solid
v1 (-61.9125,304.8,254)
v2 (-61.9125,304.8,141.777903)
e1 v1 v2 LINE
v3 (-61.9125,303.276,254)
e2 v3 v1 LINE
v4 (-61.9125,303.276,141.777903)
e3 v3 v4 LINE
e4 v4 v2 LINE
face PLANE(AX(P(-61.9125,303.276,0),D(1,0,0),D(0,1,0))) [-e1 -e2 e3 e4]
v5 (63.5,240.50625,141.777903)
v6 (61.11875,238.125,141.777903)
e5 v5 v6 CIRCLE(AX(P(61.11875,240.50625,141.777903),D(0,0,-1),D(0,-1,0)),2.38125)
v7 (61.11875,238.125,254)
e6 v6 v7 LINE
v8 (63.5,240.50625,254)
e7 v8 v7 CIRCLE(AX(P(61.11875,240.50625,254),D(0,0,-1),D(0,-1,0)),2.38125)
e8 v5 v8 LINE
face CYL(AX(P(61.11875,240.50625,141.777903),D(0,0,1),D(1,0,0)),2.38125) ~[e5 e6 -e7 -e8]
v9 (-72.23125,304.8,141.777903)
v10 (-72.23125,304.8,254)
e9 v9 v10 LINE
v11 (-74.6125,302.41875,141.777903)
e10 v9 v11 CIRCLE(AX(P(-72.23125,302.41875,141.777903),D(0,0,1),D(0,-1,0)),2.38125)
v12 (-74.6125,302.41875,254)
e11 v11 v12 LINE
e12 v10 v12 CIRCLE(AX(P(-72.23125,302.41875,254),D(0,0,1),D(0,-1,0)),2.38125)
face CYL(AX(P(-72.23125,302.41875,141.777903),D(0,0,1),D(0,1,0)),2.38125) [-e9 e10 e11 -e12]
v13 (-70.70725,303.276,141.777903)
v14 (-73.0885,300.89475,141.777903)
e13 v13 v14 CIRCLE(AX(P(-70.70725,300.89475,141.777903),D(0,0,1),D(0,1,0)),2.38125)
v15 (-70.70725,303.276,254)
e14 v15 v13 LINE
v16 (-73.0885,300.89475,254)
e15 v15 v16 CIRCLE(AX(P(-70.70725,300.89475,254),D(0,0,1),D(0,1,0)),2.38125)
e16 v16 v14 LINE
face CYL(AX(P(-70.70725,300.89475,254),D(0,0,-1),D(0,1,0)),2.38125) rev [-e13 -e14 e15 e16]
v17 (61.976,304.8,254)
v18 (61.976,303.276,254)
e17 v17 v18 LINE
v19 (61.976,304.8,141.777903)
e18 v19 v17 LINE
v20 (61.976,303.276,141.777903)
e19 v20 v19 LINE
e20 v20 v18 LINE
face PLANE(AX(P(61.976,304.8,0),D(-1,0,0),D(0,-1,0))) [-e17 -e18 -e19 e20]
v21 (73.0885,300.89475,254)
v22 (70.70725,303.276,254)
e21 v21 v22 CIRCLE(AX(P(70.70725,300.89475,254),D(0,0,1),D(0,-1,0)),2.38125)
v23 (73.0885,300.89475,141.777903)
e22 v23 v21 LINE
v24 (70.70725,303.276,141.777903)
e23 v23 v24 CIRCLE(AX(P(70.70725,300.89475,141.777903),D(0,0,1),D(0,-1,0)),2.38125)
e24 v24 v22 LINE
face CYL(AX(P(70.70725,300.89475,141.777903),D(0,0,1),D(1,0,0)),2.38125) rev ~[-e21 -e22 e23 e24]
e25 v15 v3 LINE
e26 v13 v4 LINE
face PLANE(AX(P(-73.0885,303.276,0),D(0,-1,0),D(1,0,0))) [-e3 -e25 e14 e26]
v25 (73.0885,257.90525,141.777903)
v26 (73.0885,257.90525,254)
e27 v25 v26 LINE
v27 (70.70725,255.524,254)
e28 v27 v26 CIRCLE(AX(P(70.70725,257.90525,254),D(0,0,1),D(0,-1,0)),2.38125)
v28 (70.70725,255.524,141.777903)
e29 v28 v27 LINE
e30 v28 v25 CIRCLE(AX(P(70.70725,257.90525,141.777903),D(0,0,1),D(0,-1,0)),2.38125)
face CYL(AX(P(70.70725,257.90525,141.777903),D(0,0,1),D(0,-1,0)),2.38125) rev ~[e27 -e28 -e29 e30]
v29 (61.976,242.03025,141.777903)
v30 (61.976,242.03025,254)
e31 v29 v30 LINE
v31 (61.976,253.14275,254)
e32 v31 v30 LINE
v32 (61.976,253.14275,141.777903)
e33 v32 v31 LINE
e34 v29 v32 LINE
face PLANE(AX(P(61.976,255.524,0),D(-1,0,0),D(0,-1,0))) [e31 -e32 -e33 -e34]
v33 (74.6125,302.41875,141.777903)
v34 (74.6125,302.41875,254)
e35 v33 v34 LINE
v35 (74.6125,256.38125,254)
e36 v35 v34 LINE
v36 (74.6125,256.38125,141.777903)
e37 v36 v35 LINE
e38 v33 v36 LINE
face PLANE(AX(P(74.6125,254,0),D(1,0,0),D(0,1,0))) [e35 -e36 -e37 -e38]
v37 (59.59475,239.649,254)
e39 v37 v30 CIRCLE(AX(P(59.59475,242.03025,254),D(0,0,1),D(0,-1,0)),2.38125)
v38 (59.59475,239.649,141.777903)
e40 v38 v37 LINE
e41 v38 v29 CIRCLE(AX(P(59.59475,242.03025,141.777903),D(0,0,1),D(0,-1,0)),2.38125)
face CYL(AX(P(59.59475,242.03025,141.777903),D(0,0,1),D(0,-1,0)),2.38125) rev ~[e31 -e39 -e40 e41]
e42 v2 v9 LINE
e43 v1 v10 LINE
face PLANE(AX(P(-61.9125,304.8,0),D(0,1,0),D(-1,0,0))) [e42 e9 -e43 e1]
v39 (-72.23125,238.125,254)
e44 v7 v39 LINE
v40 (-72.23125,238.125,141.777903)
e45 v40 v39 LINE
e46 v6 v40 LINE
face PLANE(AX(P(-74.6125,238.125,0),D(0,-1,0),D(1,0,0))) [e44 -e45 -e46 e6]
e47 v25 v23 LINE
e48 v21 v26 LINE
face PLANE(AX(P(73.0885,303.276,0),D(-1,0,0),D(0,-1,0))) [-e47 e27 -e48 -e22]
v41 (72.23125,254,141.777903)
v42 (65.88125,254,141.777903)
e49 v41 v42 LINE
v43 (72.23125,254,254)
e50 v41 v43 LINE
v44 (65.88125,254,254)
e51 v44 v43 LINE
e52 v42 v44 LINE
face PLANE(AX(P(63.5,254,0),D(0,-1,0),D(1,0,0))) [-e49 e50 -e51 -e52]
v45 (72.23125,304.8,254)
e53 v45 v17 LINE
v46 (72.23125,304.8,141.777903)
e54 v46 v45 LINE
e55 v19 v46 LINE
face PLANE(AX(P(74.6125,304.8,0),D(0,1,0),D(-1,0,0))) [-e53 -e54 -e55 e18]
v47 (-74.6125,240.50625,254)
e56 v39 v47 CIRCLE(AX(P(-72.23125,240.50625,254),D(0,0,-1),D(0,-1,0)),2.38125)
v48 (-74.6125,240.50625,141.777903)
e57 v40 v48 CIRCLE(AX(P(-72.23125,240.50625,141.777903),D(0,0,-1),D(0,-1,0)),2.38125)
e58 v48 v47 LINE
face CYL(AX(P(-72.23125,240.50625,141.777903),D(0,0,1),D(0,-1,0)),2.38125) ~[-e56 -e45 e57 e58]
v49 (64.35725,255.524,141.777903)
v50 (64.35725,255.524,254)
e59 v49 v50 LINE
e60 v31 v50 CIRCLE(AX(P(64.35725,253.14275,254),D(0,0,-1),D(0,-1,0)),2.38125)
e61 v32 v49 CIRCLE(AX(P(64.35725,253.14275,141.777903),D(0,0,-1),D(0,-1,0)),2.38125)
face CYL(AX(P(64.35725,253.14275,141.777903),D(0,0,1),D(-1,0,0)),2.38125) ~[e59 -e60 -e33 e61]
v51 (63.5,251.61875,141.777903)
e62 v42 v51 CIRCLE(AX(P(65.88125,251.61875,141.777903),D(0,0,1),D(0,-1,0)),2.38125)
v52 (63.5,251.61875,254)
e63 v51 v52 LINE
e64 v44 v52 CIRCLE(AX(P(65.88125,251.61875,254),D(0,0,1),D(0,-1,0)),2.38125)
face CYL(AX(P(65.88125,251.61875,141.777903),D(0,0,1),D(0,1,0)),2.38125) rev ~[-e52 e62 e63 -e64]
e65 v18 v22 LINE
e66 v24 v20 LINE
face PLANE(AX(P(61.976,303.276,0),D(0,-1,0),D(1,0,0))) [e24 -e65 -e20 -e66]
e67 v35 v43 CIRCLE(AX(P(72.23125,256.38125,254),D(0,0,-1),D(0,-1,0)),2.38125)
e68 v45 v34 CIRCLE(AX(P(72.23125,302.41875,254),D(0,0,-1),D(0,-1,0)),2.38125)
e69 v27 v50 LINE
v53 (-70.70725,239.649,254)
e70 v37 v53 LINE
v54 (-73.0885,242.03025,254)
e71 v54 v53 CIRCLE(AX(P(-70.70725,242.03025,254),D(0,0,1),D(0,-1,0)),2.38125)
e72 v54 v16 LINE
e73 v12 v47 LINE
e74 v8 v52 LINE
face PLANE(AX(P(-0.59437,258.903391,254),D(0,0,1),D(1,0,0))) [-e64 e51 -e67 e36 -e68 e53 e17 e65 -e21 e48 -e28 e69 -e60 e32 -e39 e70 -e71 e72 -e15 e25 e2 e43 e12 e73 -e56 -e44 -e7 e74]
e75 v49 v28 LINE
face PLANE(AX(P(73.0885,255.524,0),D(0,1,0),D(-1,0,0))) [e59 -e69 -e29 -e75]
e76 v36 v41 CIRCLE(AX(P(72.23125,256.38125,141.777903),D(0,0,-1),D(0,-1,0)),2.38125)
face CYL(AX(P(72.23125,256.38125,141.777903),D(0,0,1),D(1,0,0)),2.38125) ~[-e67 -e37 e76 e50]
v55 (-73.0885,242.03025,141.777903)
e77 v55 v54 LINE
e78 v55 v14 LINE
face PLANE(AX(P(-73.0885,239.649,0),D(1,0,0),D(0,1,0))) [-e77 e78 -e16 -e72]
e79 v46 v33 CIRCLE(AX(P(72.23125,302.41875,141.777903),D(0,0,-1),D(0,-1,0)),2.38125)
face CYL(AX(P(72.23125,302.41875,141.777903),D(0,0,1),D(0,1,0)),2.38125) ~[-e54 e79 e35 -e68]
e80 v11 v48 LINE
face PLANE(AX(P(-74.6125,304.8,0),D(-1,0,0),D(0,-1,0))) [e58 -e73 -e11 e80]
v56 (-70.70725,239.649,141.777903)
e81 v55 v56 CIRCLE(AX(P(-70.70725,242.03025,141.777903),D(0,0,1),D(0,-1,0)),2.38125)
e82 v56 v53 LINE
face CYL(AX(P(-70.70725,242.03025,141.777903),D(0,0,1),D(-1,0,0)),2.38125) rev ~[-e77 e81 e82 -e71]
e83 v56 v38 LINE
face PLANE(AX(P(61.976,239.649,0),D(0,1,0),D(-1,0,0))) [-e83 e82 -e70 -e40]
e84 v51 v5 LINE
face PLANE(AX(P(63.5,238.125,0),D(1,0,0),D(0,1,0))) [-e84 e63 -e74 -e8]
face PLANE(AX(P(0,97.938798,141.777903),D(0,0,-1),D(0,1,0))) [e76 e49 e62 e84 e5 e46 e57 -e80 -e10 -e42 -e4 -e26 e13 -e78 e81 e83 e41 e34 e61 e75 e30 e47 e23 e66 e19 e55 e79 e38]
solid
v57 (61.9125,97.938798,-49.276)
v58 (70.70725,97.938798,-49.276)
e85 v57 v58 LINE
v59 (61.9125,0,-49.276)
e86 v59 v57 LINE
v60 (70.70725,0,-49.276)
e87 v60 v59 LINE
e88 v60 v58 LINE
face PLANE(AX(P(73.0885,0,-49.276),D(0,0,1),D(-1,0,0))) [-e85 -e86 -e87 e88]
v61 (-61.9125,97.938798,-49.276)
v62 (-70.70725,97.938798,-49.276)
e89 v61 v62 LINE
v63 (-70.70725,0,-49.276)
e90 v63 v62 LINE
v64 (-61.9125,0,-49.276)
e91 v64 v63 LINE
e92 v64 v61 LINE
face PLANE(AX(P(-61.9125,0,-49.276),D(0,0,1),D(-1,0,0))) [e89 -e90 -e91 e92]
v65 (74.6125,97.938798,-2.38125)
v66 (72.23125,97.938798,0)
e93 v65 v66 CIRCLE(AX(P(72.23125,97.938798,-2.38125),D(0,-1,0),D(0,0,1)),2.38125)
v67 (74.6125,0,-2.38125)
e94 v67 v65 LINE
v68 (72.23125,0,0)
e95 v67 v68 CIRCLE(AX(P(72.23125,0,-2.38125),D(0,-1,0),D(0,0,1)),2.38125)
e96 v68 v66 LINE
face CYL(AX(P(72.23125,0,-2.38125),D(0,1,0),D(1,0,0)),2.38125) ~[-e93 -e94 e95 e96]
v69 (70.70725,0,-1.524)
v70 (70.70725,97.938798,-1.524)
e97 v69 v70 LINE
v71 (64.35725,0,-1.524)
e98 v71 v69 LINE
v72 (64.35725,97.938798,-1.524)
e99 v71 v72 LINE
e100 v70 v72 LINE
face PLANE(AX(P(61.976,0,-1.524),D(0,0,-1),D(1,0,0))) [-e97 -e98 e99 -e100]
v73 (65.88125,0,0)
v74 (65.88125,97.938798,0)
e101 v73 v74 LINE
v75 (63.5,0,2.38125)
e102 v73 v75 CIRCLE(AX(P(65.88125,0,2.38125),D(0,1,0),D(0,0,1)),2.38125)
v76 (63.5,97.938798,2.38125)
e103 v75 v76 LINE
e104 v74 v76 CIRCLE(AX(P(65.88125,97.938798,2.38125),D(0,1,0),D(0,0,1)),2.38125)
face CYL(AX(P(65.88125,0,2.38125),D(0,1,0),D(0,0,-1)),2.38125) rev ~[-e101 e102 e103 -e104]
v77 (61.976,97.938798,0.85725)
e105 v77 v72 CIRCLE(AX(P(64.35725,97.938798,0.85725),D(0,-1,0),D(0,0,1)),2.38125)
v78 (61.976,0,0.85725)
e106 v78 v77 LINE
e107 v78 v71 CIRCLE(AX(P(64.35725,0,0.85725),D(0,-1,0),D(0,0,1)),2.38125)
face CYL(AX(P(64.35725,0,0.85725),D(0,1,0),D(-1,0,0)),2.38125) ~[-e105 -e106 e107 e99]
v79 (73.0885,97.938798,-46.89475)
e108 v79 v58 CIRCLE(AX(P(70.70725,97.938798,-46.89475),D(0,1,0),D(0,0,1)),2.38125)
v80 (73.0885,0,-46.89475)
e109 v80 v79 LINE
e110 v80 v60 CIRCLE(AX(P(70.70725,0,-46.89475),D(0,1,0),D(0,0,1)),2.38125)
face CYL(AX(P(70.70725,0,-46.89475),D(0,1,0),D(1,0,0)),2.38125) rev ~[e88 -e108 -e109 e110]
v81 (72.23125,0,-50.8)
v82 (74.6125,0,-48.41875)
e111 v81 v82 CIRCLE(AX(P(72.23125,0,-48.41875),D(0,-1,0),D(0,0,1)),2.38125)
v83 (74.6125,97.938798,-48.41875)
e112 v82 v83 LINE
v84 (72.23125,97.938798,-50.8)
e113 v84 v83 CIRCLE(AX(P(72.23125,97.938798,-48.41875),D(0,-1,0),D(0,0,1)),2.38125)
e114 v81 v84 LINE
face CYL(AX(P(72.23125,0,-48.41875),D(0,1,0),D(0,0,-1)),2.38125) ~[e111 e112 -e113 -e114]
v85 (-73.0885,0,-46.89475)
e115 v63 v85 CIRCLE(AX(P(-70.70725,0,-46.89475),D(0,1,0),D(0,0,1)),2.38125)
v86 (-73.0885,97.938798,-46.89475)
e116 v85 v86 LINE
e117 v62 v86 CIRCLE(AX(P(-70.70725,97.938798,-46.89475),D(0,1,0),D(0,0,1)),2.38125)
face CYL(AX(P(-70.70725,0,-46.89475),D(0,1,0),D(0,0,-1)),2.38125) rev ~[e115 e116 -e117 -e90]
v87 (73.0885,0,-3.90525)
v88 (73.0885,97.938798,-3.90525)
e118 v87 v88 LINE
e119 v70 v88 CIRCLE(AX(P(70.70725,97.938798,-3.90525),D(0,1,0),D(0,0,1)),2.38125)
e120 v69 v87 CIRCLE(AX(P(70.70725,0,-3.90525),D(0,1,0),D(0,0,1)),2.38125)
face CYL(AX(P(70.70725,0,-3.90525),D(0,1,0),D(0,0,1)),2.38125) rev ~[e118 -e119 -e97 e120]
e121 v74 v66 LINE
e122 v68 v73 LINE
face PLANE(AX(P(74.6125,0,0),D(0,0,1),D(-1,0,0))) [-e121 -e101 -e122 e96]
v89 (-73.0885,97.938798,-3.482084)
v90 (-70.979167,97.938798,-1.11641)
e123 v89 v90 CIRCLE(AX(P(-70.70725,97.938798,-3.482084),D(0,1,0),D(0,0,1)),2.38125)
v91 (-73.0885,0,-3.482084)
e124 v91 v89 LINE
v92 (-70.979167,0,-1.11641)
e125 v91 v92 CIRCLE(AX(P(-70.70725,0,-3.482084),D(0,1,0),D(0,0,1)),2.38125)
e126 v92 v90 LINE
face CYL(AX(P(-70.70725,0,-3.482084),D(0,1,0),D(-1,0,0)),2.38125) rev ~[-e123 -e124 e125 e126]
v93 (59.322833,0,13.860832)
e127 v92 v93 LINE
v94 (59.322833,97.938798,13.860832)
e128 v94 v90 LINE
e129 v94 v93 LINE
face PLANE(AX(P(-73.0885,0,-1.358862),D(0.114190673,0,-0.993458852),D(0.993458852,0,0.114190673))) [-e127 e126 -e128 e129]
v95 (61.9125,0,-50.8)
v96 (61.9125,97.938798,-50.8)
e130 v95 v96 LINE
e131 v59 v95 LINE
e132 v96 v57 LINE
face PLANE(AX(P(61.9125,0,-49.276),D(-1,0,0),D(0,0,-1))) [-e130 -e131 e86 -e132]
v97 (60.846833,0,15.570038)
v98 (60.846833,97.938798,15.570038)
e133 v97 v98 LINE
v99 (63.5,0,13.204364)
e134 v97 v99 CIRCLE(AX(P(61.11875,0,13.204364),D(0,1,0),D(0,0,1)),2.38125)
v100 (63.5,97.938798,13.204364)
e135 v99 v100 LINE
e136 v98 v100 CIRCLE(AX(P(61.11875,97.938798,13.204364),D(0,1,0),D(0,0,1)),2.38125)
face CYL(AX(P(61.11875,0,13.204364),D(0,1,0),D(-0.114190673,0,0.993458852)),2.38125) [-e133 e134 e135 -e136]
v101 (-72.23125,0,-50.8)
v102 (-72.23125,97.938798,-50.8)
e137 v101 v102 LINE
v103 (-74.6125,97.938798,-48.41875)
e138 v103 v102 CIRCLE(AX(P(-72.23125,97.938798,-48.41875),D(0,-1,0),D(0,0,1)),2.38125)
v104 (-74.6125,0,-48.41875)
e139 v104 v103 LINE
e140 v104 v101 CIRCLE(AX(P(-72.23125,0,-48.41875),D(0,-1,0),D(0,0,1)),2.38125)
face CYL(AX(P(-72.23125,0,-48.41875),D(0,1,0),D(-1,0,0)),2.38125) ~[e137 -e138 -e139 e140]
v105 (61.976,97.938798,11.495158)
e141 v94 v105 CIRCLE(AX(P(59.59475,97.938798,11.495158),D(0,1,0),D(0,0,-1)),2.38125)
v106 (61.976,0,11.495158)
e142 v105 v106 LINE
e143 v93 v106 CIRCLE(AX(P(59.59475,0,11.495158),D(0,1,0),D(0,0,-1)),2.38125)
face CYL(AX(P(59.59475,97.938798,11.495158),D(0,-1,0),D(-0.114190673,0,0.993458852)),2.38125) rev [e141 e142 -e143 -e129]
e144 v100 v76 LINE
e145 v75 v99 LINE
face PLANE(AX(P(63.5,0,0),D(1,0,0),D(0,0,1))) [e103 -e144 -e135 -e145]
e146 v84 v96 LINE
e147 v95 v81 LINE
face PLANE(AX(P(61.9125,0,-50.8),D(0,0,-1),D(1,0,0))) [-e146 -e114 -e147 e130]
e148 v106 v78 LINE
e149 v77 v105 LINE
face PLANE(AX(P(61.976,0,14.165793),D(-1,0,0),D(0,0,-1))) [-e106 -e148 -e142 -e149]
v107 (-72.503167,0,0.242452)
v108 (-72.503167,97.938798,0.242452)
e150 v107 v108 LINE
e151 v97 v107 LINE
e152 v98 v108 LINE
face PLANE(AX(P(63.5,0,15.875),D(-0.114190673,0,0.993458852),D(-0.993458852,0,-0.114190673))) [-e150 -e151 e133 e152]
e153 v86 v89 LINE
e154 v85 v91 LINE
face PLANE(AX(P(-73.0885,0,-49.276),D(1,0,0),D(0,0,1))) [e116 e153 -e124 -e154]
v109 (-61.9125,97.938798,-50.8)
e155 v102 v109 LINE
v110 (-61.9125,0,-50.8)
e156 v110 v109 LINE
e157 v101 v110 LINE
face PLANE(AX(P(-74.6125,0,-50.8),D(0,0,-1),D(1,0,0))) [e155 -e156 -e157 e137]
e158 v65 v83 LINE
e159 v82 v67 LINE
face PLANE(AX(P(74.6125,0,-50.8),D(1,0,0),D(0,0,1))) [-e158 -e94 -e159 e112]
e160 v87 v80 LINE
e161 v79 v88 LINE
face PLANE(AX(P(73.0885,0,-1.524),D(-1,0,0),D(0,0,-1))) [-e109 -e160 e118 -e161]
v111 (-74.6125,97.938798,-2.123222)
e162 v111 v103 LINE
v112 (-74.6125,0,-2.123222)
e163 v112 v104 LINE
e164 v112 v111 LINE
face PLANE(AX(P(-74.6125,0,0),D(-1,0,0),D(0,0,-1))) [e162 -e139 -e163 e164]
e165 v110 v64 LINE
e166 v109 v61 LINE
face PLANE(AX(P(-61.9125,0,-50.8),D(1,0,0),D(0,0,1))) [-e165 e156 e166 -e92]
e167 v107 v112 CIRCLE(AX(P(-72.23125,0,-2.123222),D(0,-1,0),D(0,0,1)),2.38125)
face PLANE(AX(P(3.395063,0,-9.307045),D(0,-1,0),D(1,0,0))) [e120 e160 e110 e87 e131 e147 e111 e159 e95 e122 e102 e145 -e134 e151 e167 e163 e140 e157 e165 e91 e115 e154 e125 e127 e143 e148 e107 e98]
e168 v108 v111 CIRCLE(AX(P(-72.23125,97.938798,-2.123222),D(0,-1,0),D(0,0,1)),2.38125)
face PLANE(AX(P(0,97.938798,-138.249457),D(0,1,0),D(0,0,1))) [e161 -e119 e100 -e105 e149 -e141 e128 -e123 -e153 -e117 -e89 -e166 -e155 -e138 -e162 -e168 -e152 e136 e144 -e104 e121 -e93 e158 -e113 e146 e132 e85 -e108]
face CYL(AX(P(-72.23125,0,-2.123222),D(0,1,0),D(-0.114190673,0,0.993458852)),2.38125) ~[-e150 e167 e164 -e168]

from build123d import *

# Parameters (mm, degrees)
F1_DEPTH       = 304.8
F3_DEPTH       = 254
F3_DEPTH_BACK  = 50.8
F6_DEPTH       = 15.875
F8_DEPTH       = 66.676
F11_W          = 2.1258684099
F11_H          = 0.0508
F12_DEPTH      = 254.001
F13_W          = 299.0930452943
F13_H          = 280.027359724
F14_DEPTH      = 74.6135
F14_DEPTH_BACK = 74.6135
F15_R          = 2.38125
F16_R          = 2.38125


# Not quite as in the source:
# - a feature of the source that left no trace in its solid (it failed there, or was rolled back) is left out


with BuildPart() as f1:
    # F0 (on Front) → F1 (new body)
    with BuildSketch(Plane.XZ):
        Polygon((-74.6125, -50.8), (-61.9125, -50.8), (-61.9125, -49.276), (-73.0885, -49.276), (-73.0885, -1.3588619322), (61.976, 14.1657932403), (61.976, -1.524), (73.0885, -1.524), (73.0885, -49.276), (61.9125, -49.276), (61.9125, -50.8), (74.6125, -50.8), (74.6125, 0), (63.5, 0), (63.5, 15.875), (-74.6125, 0), align=None)
    extrude(amount=-F1_DEPTH)


with BuildPart() as f3:
    # F2 (on Top) → F3 (new body, two sides)
    with BuildSketch(Plane.XY) as f3_sk:
        Polygon((-61.9125, 304.8), (-74.6125, 304.8), (-74.6125, 238.125), (63.5, 238.125), (63.5, 254), (74.6125, 254), (74.6125, 304.8), (61.976, 304.8), (61.976, 303.276), (73.0885, 303.276), (73.0885, 255.524), (61.976, 255.524), (61.976, 239.649), (-73.0885, 239.649), (-73.0885, 303.276), (-61.9125, 303.276), align=None)
    extrude(amount=F3_DEPTH)
    extrude(f3_sk.sketch, amount=-F3_DEPTH_BACK)


with BuildPart() as f6_tool:
    # F5 (on face) → F6 (new body, through all)
    with BuildSketch(Plane.XZ.offset(-238.125)):
        Polygon((61.976, 14.1657932403), (-73.0885, -1.3588619322), (-91.1419016793, -3.4339655735), (-91.1419016793, -71.0971727967), (86.3244011998, -71.0971727967), (86.3244011998, 0), (61.976, 0), align=None)
    extrude(amount=-F6_DEPTH)


with BuildPart() as f1_1:
    add(f1.part)

    # F6: cut by f6_tool
    add(f6_tool.part, mode=Mode.SUBTRACT)


with BuildPart() as f3_1:
    add(f3.part)

    # F6: cut by f6_tool
    add(f6_tool.part, mode=Mode.SUBTRACT)


with BuildPart() as f8_tool:
    # F7 (on face) → F8 (new body, through all)
    with BuildSketch(Plane.XZ.offset(-238.125)):
        Polygon((-74.6125, 0), (-74.6125, -1.5340343459), (61.976, 14.1657932403), (61.976, 0), (63.5, 0), (63.5, 15.875), align=None)
    extrude(amount=-F8_DEPTH)


with BuildPart() as f1_2:
    add(f1_1.part)

    # F8: cut by f8_tool
    add(f8_tool.part, mode=Mode.SUBTRACT)


with BuildPart() as f3_2:
    add(f3_1.part)

    # F8: cut by f8_tool
    add(f8_tool.part, mode=Mode.SUBTRACT)


with BuildPart() as f1_3:
    add(f1_2.part)

    # F10: union F3
    add(f3_2.part)

    # F11 (on face) → F12 (cut, through all)
    with BuildSketch(Plane.XY):
        with Locations((62.4370657951, 238.0996)):
            Rectangle(F11_W, F11_H)
    extrude(amount=F12_DEPTH, mode=Mode.SUBTRACT)

    # F13 (on Right) → F14 (cut, two sides)
    with BuildSketch(Plane.YZ) as f14_sk:
        with Locations((247.4853210151, 1.7642229795)):
            Rectangle(F13_W, F13_H)
    extrude(amount=-F14_DEPTH, mode=Mode.SUBTRACT)
    extrude(f14_sk.sketch, amount=F14_DEPTH_BACK, mode=Mode.SUBTRACT)

    # F15
    f15_edges = [f1_3.edges().sort_by_distance(p)[0] for p in [
        (-73.0885, 239.649, 197.888951),
        (-74.6125, 238.125, 197.888951),
        (-74.6125, 304.8, 197.888951),
        (-73.0885, 303.276, 197.888951),
        (61.976, 239.649, 197.888951),
        (61.976, 255.524, 197.888951),
        (73.0885, 255.524, 197.888951),
        (73.0885, 303.276, 197.888951),
        (63.5, 238.125, 197.888951),
        (63.5, 254, 197.888951),
        (74.6125, 254, 197.888951),
        (74.6125, 304.8, 197.888951),
    ]]
    fillet(f15_edges, radius=F15_R)

    # F16
    f16_edges = [f1_3.edges().sort_by_distance(p)[0] for p in [
        (-73.0885, 48.969399, -49.276),
        (-73.0885, 48.969399, -1.358862),
        (61.976, 48.969399, 14.165793),
        (61.976, 48.969399, -1.524),
        (73.0885, 48.969399, -1.524),
        (73.0885, 48.969399, -49.276),
        (74.6125, 48.969399, -50.8),
        (74.6125, 48.969399, 0),
        (63.5, 48.969399, 15.875),
        (-74.6125, 48.969399, 0),
        (-74.6125, 48.969399, -50.8),
        (63.5, 48.969399, 0),
    ]]
    fillet(f16_edges, radius=F16_R)


solid = f1_3.part
